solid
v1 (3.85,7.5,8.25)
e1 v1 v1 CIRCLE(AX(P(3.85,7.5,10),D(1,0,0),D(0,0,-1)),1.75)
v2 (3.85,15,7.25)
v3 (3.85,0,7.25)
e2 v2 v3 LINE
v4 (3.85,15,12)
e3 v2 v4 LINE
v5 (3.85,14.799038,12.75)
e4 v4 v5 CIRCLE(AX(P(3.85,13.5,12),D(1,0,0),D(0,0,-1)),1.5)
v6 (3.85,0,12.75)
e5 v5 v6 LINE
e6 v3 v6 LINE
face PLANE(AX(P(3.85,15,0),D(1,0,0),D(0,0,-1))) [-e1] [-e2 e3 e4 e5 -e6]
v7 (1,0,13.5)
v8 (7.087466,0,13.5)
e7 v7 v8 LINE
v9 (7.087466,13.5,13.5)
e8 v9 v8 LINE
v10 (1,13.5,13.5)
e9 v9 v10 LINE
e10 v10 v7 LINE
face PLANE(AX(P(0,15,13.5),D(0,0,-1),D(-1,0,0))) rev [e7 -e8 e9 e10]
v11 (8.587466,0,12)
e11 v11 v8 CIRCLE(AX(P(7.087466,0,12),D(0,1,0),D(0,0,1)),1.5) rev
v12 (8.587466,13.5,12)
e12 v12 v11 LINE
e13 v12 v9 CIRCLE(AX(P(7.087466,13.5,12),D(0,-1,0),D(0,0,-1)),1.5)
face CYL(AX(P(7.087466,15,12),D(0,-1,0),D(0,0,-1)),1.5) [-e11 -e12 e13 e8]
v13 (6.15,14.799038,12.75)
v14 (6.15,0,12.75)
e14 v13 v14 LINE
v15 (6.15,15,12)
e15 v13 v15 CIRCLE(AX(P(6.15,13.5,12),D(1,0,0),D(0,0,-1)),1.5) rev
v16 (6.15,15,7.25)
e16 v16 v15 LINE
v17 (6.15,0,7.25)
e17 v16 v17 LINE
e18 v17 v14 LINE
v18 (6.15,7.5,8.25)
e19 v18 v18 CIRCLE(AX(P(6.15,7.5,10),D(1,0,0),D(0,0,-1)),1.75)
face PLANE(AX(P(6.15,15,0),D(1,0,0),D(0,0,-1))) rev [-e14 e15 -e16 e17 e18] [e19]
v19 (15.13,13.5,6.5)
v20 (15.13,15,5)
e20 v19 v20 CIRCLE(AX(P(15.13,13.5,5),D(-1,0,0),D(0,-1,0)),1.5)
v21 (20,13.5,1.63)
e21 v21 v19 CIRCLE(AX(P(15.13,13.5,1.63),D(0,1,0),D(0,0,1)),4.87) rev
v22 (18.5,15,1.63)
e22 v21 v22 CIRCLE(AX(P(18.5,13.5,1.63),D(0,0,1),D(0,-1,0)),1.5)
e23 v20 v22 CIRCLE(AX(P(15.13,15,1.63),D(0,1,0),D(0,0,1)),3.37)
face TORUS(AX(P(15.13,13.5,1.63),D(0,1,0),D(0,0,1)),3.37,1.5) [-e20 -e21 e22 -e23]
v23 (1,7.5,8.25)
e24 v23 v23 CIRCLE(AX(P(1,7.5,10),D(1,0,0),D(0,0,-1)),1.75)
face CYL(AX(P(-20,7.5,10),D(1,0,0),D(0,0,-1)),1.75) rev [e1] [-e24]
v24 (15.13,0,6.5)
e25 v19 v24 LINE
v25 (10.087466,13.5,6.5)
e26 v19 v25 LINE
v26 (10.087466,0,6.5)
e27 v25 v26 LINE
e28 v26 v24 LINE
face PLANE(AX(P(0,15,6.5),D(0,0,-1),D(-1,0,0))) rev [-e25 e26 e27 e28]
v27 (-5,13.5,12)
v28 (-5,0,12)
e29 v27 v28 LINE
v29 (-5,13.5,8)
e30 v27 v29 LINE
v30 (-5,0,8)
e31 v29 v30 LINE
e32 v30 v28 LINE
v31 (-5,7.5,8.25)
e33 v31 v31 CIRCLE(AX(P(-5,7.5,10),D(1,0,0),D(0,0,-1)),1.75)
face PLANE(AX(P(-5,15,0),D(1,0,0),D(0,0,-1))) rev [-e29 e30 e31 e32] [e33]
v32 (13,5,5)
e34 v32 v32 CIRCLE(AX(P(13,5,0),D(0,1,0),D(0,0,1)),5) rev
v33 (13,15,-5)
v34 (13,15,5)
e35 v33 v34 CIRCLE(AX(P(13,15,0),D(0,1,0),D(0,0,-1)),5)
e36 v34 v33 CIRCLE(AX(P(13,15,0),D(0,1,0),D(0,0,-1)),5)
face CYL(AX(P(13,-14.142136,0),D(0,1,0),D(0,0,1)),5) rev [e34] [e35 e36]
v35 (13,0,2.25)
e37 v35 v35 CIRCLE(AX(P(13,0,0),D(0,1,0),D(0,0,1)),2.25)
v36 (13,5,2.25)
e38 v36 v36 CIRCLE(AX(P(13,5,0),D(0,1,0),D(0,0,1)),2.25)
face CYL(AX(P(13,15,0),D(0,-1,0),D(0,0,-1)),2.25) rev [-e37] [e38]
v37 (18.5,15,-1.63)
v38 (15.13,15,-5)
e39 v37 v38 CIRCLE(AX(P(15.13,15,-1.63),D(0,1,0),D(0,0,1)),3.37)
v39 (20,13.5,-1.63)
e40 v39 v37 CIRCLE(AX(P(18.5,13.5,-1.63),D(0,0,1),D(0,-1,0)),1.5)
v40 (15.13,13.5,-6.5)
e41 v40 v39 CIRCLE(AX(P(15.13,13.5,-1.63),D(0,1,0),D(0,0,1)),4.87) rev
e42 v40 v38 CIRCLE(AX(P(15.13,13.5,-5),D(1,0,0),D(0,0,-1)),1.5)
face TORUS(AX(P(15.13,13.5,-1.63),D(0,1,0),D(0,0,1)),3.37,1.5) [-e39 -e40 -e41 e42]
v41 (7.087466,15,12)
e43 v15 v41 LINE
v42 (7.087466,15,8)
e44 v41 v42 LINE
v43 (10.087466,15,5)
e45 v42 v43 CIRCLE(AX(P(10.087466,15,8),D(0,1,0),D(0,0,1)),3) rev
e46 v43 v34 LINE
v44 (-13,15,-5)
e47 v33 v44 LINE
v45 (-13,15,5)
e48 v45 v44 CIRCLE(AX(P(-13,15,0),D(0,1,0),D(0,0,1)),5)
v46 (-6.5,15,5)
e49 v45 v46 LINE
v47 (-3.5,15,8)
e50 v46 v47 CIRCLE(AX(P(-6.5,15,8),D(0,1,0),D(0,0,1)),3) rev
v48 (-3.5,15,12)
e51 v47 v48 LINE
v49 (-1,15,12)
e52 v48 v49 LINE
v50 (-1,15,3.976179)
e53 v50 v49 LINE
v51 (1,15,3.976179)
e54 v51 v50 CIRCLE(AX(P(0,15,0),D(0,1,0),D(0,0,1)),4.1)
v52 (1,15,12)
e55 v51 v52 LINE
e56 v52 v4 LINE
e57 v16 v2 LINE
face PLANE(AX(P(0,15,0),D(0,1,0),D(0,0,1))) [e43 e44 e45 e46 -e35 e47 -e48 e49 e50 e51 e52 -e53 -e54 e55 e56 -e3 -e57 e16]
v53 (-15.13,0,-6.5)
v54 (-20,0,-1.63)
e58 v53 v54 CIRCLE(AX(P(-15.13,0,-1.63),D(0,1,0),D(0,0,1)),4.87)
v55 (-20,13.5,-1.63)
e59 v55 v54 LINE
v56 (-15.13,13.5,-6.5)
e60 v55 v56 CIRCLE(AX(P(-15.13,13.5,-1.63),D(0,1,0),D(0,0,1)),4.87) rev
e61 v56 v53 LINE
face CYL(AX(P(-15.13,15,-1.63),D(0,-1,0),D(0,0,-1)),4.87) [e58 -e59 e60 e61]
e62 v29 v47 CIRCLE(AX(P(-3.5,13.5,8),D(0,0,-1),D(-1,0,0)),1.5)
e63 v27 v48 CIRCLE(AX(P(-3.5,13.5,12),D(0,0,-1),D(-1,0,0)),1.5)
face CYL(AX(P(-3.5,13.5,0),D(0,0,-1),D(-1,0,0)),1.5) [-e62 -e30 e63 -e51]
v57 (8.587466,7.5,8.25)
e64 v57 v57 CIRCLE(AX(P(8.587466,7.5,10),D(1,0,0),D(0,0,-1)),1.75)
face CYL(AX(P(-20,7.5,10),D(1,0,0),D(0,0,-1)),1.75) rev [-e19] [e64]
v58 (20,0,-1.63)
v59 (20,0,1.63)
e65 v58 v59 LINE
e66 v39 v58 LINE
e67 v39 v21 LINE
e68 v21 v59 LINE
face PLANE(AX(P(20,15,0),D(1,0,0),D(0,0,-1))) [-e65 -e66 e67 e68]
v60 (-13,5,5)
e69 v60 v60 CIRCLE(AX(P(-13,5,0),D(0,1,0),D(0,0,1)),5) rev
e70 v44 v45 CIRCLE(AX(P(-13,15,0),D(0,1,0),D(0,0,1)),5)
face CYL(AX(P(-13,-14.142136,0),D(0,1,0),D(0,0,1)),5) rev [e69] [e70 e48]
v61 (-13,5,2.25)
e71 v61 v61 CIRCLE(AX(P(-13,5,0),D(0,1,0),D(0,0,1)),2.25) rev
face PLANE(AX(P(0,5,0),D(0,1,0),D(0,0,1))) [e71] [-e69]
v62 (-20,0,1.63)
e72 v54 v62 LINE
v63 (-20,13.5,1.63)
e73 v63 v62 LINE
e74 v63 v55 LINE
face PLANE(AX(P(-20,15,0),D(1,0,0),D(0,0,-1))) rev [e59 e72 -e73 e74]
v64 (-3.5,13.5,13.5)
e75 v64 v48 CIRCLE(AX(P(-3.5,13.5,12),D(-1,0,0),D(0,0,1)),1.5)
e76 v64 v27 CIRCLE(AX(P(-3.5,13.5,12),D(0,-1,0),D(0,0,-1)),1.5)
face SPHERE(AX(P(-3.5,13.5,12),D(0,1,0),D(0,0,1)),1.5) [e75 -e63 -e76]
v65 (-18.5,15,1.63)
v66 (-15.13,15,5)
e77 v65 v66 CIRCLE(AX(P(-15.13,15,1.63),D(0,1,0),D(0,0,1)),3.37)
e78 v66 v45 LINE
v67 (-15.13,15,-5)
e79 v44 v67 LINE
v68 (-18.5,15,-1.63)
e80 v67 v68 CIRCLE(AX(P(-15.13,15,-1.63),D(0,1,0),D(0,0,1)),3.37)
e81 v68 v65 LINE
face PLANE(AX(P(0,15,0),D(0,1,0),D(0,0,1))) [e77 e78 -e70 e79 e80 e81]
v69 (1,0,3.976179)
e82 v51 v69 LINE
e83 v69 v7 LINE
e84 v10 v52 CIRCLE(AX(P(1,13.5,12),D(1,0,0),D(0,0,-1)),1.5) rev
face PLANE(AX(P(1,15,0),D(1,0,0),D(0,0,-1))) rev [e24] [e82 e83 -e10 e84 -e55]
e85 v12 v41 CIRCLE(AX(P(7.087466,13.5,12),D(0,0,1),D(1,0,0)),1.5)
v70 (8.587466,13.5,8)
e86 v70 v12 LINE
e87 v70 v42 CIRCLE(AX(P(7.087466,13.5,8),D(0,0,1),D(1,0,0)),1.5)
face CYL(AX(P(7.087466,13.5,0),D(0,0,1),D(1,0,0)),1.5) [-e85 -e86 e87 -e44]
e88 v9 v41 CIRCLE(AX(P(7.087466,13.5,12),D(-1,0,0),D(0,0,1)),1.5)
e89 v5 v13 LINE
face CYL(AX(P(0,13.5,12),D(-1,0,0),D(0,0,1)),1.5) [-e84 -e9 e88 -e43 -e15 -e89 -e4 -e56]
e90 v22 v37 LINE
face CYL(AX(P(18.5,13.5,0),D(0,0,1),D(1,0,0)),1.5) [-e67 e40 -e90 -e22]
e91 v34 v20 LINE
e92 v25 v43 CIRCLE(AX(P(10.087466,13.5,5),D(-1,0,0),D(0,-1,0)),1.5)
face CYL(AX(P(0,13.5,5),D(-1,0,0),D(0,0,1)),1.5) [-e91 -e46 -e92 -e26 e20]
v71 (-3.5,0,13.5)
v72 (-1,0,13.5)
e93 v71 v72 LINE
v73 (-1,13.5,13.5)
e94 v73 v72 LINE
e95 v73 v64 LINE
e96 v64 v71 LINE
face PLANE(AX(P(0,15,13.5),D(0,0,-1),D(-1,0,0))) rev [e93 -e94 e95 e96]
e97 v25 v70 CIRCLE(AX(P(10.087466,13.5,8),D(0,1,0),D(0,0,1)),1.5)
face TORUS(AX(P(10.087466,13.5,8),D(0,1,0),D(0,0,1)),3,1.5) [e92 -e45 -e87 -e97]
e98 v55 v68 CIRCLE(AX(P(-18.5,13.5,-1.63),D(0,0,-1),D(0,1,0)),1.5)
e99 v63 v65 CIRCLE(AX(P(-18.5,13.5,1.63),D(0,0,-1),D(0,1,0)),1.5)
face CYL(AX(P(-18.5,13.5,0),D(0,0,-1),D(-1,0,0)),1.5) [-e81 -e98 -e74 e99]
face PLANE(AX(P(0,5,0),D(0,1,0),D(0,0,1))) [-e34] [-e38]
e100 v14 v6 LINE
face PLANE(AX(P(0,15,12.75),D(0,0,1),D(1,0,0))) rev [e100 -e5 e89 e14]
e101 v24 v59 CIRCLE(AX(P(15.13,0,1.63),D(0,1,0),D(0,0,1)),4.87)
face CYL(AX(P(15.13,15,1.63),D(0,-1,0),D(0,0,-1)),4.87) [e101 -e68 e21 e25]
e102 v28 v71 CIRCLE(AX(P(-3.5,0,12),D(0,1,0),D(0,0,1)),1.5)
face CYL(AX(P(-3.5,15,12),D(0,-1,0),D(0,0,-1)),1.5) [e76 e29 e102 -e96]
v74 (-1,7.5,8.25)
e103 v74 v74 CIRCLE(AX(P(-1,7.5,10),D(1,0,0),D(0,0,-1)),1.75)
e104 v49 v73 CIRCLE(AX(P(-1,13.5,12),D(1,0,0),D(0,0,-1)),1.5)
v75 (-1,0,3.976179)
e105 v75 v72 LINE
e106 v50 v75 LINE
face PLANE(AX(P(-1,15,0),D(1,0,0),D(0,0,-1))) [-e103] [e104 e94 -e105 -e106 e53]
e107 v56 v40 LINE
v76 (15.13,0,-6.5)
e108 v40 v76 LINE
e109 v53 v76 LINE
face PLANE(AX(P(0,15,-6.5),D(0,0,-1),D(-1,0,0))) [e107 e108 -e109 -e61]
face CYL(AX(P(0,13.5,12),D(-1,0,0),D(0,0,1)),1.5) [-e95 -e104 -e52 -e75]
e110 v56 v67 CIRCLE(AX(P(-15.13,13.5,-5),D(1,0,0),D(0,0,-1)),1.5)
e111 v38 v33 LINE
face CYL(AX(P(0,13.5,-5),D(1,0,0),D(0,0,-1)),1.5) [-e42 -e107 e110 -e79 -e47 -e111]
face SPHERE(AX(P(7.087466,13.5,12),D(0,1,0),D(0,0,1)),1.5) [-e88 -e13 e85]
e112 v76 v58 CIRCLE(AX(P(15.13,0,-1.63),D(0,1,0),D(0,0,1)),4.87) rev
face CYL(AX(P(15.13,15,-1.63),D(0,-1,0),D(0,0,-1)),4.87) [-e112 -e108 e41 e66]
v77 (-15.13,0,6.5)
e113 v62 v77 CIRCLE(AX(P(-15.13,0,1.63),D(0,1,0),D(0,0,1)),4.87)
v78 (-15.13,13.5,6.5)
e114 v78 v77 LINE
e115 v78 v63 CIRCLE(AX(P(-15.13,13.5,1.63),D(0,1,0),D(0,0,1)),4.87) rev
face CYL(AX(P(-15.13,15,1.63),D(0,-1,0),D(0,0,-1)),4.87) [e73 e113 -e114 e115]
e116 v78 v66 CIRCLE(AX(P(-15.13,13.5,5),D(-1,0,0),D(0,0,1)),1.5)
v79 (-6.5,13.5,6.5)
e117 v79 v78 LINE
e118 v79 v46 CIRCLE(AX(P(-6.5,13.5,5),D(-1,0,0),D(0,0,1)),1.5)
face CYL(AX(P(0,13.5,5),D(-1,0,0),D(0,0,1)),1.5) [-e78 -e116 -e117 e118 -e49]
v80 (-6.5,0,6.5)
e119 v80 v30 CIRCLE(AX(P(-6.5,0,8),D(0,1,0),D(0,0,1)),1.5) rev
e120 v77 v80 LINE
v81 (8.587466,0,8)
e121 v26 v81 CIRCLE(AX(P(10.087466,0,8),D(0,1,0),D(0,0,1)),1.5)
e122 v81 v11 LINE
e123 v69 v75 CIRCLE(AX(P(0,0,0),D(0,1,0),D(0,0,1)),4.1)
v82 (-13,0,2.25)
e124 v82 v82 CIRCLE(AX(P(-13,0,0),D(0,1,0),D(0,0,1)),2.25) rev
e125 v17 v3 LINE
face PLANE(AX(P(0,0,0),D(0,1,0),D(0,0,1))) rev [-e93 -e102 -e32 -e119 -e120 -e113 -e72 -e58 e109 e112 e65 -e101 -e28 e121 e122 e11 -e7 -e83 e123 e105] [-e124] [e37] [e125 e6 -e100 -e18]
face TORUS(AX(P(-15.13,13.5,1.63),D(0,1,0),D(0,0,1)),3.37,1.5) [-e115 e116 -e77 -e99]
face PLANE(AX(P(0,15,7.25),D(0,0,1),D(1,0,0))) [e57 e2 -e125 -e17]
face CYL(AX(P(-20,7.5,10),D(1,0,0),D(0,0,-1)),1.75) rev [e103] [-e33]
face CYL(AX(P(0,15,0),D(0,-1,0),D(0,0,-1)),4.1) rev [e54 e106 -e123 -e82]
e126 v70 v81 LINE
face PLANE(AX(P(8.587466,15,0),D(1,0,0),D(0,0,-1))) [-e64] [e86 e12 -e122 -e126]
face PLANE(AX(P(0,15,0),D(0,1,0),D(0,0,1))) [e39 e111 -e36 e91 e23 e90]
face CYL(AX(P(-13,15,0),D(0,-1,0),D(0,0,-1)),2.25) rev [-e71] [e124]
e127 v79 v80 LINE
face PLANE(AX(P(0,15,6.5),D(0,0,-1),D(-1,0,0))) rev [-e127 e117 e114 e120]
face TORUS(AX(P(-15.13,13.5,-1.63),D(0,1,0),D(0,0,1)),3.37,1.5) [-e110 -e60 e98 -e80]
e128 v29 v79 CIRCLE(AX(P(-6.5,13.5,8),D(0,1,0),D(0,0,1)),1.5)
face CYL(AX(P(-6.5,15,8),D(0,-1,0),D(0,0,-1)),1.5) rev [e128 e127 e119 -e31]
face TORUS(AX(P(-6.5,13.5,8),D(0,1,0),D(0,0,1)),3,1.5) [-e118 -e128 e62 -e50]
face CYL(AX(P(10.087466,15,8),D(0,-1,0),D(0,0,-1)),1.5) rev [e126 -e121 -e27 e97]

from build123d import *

# Parameters (mm, degrees)
SKETCH1_W               = 2.3
SKETCH1_H               = 5.5
SKETCH1_R               = 2.25
BOSS_EXTRUDE1_DEPTH     = 15
CUT_EXTRUDE1_DEPTH      = 33.128647653
CUT_EXTRUDE1_DEPTH_BACK = 33.128647653
SKETCH2_R               = 1.75
FILLET2_R               = 1.5
SKETCH4_R               = 5
CUT_EXTRUDE2_DEPTH      = 10


with BuildPart() as part:
    # Sketch1 → Boss-Extrude1 (new body)
    with BuildSketch(Plane(origin=(0, 0, 0), x_dir=(1, 0, 0), z_dir=(0, 1, 0))):
        with BuildLine():
            Line((15.13, 6.5), (-15.13, 6.5))
            ThreePointArc((-15.13, 6.5), (-18.573610024, 5.073610024), (-20, 1.63))
            Line((-20, 1.63), (-20, -1.63))
            ThreePointArc((-20, -1.63), (-18.573610024, -5.073610024), (-15.13, -6.5))
            Line((-15.13, -6.5), (-6.5, -6.5))
            ThreePointArc((-6.5, -6.5), (-5.439339828, -6.939339828), (-5, -8))
            Line((-5, -8), (-5, -12))
            ThreePointArc((-5, -12), (-4.560660172, -13.060660172), (-3.5, -13.5))
            Line((-3.5, -13.5), (-1, -13.5))
            Line((-1, -13.5), (-1, -3.97617907))
            ThreePointArc((-1, -3.97617907), (-2.520912533, 3.233419243), (4.1, 0))
            ThreePointArc((4.1, 0), (3.233419243, -2.520912533), (1, -3.97617907))
            Line((1, -3.97617907), (1, -13.5))
            Line((1, -13.5), (5.587465673, -13.5))
            Line((5.587465673, -13.5), (7.087465673, -13.5))
            ThreePointArc((7.087465673, -13.5), (8.148125845, -13.060660172), (8.587465673, -12))
            Line((8.587465673, -12), (8.587465673, -8))
            ThreePointArc((8.587465673, -8), (9.026805501, -6.939339828), (10.087465673, -6.5))
            Line((10.087465673, -6.5), (15.13, -6.5))
            ThreePointArc((15.13, -6.5), (18.573610024, -5.073610024), (20, -1.63))
            Line((20, -1.63), (20, 1.63))
            ThreePointArc((20, 1.63), (18.573610024, 5.073610024), (15.13, 6.5))
        make_face()
        with Locations((5, -10)):
            Rectangle(SKETCH1_W, SKETCH1_H, mode=Mode.SUBTRACT)
        with Locations(Location((-13, 0, 0), (0, 0, 270))):
            Circle(SKETCH1_R, mode=Mode.SUBTRACT)
        with Locations(Location((13, 0, 0), (0, 0, 270))):
            Circle(SKETCH1_R, mode=Mode.SUBTRACT)
    extrude(amount=BOSS_EXTRUDE1_DEPTH)

    # Sketch2 → Cut-Extrude1 (cut, two sides: drawn at the far end of the back side and taken through both)
    with BuildSketch(Plane(origin=(5, 0, 0), x_dir=(0, 0, -1), z_dir=(1, 0, 0)).offset(-CUT_EXTRUDE1_DEPTH_BACK)):
        with Locations((-10, 7.5)):
            Circle(SKETCH2_R)
    extrude(amount=CUT_EXTRUDE1_DEPTH + CUT_EXTRUDE1_DEPTH_BACK, mode=Mode.SUBTRACT)

    # Fillet2
    # the kernel refuses this fillet: 1.5 mm, written as the material it takes off along each edge
    with BuildSketch(Plane(origin=(7.087465673, 15, 13.5), x_dir=(0, 0, -1), z_dir=(-1, 0, 0))) as fillet2_piece_1:
        with BuildLine():
            CenterArc((FILLET2_R, FILLET2_R), FILLET2_R, 180, 90)
            Line((0, FILLET2_R), (0, 0))
            Line((0, 0), (FILLET2_R, 0))
        make_face()
    extrude(amount=9.837465673, mode=Mode.SUBTRACT)
    with BuildSketch(Plane(origin=(10.087465673, 15, 6.5), x_dir=(0, 0, -1), z_dir=(1, 0, 0))) as fillet2_piece_2:
        with BuildLine():
            CenterArc((FILLET2_R, -FILLET2_R), FILLET2_R, 90, 90)
            Line((0, -FILLET2_R), (0, 0))
            Line((0, 0), (FILLET2_R, 0))
        make_face()
    extrude(amount=5.042534327, mode=Mode.SUBTRACT)
    with BuildSketch(Plane(origin=(15.13, 15, 1.63), x_dir=(0, 0, 1), z_dir=(-1, 0, 0))) as fillet2_piece_3:
        with BuildLine():
            CenterArc((4.87 - FILLET2_R, -FILLET2_R), FILLET2_R, 0, 90)
            Line((4.87, -FILLET2_R), (4.87, 0))
            Line((4.87, 0), (4.87 - FILLET2_R, 0))
        make_face()
    revolve(axis=Axis((15.13, 15, 1.63), (0, 1, 0)), revolution_arc=90, mode=Mode.SUBTRACT)
    with BuildSketch(Plane(origin=(20, 15, 1.63), x_dir=(-1, 0, 0), z_dir=(0, 0, -1)), Plane(origin=(-20, 15, -1.63), x_dir=(1, 0, 0), z_dir=(0, 0, 1))) as fillet2_piece_4:
        with BuildLine():
            CenterArc((FILLET2_R, -FILLET2_R), FILLET2_R, 90, 90)
            Line((0, -FILLET2_R), (0, 0))
            Line((0, 0), (FILLET2_R, 0))
        make_face()
    extrude(amount=3.26, mode=Mode.SUBTRACT)
    with BuildSketch(Plane(origin=(15.13, 15, -1.63), x_dir=(1, 0, 0), z_dir=(0, 0, 1))) as fillet2_piece_5:
        with BuildLine():
            CenterArc((4.87 - FILLET2_R, -FILLET2_R), FILLET2_R, 0, 90)
            Line((4.87, -FILLET2_R), (4.87, 0))
            Line((4.87, 0), (4.87 - FILLET2_R, 0))
        make_face()
    revolve(axis=Axis((15.13, 15, -1.63), (0, 1, 0)), revolution_arc=90, mode=Mode.SUBTRACT)
    with BuildSketch(Plane(origin=(15.13, 15, -6.5), x_dir=(0, 0, 1), z_dir=(-1, 0, 0))) as fillet2_piece_6:
        with BuildLine():
            CenterArc((FILLET2_R, -FILLET2_R), FILLET2_R, 90, 90)
            Line((0, -FILLET2_R), (0, 0))
            Line((0, 0), (FILLET2_R, 0))
        make_face()
    extrude(amount=30.26, mode=Mode.SUBTRACT)
    with BuildSketch(Plane(origin=(-15.13, 15, -1.63), x_dir=(0, 0, -1), z_dir=(1, 0, 0))) as fillet2_piece_7:
        with BuildLine():
            CenterArc((4.87 - FILLET2_R, -FILLET2_R), FILLET2_R, 0, 90)
            Line((4.87, -FILLET2_R), (4.87, 0))
            Line((4.87, 0), (4.87 - FILLET2_R, 0))
        make_face()
    revolve(axis=Axis((-15.13, 15, -1.63), (0, 1, 0)), revolution_arc=90, mode=Mode.SUBTRACT)
    with BuildSketch(Plane(origin=(-3.5, 15, 13.5), x_dir=(0, 0, -1), z_dir=(1, 0, 0))) as fillet2_piece_8:
        with BuildLine():
            CenterArc((FILLET2_R, -FILLET2_R), FILLET2_R, 90, 90)
            Line((0, -FILLET2_R), (0, 0))
            Line((0, 0), (FILLET2_R, 0))
        make_face()
    extrude(amount=6.25, mode=Mode.SUBTRACT)
    with BuildSketch(Plane(origin=(-3.5, 15, 12), x_dir=(-1, 0, 0), z_dir=(0, 0, -1))) as fillet2_piece_9:
        with BuildLine():
            CenterArc((1.5 - FILLET2_R, -FILLET2_R), FILLET2_R, 0, 90)
            Line((1.5, -FILLET2_R), (1.5, 0))
            Line((1.5, 0), (1.5 - FILLET2_R, 0))
        make_face()
    revolve(axis=Axis((-3.5, 15, 12), (0, 1, 0)), revolution_arc=90, mode=Mode.SUBTRACT)
    with BuildSketch(Plane(origin=(-5, 15, 8), x_dir=(1, 0, 0), z_dir=(0, 0, 1)), Plane(origin=(8.587465673, 15, 12), x_dir=(-1, 0, 0), z_dir=(0, 0, -1))) as fillet2_piece_10:
        with BuildLine():
            CenterArc((FILLET2_R, -FILLET2_R), FILLET2_R, 90, 90)
            Line((0, -FILLET2_R), (0, 0))
            Line((0, 0), (FILLET2_R, 0))
        make_face()
    extrude(amount=4, mode=Mode.SUBTRACT)
    with BuildSketch(Plane(origin=(-6.5, 15, 8), x_dir=(0, 0, -1), z_dir=(-1, 0, 0))) as fillet2_piece_11:
        with BuildLine():
            CenterArc((1.5 + FILLET2_R, FILLET2_R), FILLET2_R, 180, 90)
            Line((1.5, FILLET2_R), (1.5, 0))
            Line((1.5, 0), (1.5 + FILLET2_R, 0))
        make_face()
    revolve(axis=Axis((-6.5, 15, 8), (0, -1, 0)), revolution_arc=90, mode=Mode.SUBTRACT)
    with BuildSketch(Plane(origin=(-15.13, 15, 1.63), x_dir=(-1, 0, 0), z_dir=(0, 0, -1))) as fillet2_piece_12:
        with BuildLine():
            CenterArc((4.87 - FILLET2_R, -FILLET2_R), FILLET2_R, 0, 90)
            Line((4.87, -FILLET2_R), (4.87, 0))
            Line((4.87, 0), (4.87 - FILLET2_R, 0))
        make_face()
    revolve(axis=Axis((-15.13, 15, 1.63), (0, 1, 0)), revolution_arc=90, mode=Mode.SUBTRACT)
    with BuildSketch(Plane(origin=(-15.13, 15, 6.5), x_dir=(0, 0, -1), z_dir=(1, 0, 0))) as fillet2_piece_13:
        with BuildLine():
            CenterArc((FILLET2_R, -FILLET2_R), FILLET2_R, 90, 90)
            Line((0, -FILLET2_R), (0, 0))
            Line((0, 0), (FILLET2_R, 0))
        make_face()
    extrude(amount=8.63, mode=Mode.SUBTRACT)
    with BuildSketch(Plane(origin=(7.087465673, 15, 12), x_dir=(0, 0, 1), z_dir=(-1, 0, 0))) as fillet2_piece_14:
        with BuildLine():
            CenterArc((1.5 - FILLET2_R, -FILLET2_R), FILLET2_R, 0, 90)
            Line((1.5, -FILLET2_R), (1.5, 0))
            Line((1.5, 0), (1.5 - FILLET2_R, 0))
        make_face()
    revolve(axis=Axis((7.087465673, 15, 12), (0, 1, 0)), revolution_arc=90, mode=Mode.SUBTRACT)
    with BuildSketch(Plane(origin=(10.087465673, 15, 8), x_dir=(-1, 0, 0), z_dir=(0, 0, 1))) as fillet2_piece_15:
        with BuildLine():
            CenterArc((1.5 + FILLET2_R, FILLET2_R), FILLET2_R, 180, 90)
            Line((1.5, FILLET2_R), (1.5, 0))
            Line((1.5, 0), (1.5 + FILLET2_R, 0))
        make_face()
    revolve(axis=Axis((10.087465673, 15, 8), (0, -1, 0)), revolution_arc=90, mode=Mode.SUBTRACT)

    # Sketch4 → Cut-Extrude2 (cut)
    with BuildSketch(Plane(origin=(0, 15, 0), x_dir=(1, 0, 0), z_dir=(0, 1, 0))):
        with Locations(Location((-13, 0, 0), (0, 0, 270))):
            Circle(SKETCH4_R)
        with Locations(Location((13, 0, 0), (0, 0, 270))):
            Circle(SKETCH4_R)
    extrude(amount=-CUT_EXTRUDE2_DEPTH, mode=Mode.SUBTRACT)


solid = part.part
